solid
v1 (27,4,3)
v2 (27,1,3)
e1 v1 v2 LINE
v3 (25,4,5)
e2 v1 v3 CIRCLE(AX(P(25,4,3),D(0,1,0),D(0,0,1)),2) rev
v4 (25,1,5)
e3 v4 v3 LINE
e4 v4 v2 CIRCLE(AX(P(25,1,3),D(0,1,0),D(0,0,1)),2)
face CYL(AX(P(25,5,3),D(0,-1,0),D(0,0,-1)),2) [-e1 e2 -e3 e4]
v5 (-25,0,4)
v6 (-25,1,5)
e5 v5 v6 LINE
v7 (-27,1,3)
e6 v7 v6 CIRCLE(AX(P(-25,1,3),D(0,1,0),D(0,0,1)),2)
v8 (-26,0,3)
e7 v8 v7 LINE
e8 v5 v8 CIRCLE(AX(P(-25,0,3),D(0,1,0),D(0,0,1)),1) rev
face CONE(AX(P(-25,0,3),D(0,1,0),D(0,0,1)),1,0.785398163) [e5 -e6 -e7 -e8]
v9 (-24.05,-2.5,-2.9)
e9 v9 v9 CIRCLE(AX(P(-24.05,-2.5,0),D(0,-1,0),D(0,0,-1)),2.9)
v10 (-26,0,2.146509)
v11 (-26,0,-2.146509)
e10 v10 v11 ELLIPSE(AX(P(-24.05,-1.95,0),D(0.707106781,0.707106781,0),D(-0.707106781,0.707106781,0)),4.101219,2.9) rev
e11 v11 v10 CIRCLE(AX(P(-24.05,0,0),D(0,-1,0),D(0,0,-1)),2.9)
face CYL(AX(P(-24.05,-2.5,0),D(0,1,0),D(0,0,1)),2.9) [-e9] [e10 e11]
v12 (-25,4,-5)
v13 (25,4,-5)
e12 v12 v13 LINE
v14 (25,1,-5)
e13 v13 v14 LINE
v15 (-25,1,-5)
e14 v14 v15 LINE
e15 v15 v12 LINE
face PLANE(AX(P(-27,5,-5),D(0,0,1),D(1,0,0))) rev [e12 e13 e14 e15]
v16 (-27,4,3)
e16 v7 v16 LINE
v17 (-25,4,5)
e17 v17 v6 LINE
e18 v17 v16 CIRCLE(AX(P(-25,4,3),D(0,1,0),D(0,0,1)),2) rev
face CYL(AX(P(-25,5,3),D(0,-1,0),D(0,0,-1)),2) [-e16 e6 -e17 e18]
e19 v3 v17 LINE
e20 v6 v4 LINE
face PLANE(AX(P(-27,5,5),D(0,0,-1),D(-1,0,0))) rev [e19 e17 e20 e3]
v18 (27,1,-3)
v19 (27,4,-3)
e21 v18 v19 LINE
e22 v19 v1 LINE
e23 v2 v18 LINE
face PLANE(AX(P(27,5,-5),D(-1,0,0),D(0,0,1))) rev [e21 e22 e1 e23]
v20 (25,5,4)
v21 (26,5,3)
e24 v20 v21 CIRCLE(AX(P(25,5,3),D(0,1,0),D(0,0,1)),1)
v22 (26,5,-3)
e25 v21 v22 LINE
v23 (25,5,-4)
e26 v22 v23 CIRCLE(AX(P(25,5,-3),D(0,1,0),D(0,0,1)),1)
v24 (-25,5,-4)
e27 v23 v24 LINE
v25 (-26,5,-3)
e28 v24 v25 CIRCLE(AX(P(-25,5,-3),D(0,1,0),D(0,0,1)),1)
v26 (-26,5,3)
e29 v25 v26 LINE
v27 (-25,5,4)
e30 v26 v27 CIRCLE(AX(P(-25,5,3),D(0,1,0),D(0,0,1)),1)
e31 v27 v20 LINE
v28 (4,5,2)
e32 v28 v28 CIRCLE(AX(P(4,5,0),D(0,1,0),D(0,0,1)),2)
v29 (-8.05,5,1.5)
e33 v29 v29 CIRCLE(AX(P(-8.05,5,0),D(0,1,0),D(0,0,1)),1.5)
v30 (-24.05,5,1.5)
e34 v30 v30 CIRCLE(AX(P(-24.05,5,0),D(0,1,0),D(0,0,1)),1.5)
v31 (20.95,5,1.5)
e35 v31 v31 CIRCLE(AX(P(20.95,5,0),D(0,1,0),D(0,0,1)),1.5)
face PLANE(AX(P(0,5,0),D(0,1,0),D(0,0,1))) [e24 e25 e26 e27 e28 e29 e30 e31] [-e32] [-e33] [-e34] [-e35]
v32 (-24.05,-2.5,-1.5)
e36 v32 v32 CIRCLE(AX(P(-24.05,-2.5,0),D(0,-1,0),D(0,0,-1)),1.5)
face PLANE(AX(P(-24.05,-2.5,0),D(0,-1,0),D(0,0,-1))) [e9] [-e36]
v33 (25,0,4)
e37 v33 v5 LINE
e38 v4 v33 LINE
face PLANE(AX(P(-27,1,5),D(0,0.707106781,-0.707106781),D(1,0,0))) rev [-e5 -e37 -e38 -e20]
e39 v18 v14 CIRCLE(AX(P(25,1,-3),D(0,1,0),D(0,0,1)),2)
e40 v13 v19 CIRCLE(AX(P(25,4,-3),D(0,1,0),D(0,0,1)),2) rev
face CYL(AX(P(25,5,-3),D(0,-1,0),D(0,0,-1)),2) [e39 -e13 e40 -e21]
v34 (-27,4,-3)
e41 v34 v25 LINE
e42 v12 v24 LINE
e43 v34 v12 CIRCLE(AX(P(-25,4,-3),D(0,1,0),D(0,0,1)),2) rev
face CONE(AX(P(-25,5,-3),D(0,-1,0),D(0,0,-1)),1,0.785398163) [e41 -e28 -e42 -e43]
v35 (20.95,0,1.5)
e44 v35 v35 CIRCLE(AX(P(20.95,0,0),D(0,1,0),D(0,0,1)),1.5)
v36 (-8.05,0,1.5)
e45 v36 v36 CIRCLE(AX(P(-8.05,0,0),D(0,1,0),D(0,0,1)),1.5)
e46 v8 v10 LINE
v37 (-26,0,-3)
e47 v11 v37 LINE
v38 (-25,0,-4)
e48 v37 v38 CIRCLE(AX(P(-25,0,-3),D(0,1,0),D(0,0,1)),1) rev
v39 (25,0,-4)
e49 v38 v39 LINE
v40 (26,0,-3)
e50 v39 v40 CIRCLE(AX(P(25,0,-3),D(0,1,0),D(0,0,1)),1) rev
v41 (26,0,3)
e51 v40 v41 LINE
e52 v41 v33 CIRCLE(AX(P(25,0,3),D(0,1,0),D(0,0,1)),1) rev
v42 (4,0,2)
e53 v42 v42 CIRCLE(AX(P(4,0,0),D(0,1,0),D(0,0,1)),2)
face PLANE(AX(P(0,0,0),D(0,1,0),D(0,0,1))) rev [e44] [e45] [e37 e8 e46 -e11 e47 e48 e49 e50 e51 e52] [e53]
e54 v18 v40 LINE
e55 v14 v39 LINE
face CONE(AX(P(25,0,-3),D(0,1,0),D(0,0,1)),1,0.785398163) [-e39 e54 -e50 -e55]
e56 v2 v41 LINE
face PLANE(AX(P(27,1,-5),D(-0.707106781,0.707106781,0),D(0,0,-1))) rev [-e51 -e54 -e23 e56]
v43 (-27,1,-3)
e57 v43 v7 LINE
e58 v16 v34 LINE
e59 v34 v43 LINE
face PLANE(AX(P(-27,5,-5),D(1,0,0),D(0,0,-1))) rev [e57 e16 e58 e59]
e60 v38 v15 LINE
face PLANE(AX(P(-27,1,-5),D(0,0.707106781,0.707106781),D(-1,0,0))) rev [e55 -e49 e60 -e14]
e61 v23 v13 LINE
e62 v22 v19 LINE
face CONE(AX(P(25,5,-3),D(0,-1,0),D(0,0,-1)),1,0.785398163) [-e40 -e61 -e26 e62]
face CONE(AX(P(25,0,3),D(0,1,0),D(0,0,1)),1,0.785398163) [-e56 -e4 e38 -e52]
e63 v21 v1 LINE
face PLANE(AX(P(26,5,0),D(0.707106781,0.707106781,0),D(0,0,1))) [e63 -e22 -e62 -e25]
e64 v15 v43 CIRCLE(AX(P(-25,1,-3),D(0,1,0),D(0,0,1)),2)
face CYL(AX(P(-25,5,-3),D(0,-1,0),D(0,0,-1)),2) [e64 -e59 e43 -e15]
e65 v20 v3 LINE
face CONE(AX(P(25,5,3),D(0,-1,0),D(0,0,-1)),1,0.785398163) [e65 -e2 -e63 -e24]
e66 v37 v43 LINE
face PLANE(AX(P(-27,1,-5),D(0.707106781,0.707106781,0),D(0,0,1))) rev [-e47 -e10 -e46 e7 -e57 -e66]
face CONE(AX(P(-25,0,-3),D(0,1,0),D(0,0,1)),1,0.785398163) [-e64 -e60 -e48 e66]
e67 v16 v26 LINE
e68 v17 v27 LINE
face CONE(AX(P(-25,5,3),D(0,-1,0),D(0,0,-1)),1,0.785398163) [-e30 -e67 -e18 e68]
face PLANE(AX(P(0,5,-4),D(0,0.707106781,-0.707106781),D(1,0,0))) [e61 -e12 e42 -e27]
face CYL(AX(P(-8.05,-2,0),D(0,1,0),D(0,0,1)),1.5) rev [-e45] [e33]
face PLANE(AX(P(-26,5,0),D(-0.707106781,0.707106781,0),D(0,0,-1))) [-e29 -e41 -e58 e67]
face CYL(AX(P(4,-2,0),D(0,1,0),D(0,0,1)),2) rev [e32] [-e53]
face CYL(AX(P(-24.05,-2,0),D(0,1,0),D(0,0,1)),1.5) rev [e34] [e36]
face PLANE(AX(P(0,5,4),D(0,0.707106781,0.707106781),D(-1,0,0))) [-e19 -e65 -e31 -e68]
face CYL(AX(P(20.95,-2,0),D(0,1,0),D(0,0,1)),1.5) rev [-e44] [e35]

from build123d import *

# Parameters (mm, degrees)
SKETCH1_W           = 54
SKETCH1_H           = 10
BOSS_EXTRUDE1_DEPTH = 5
SKETCH3_R           = 1.5
SKETCH3_R_2         = 2
CUT_EXTRUDE1_DEPTH  = 7
FILLET1_R           = 2
SKETCH4_R           = 2.9
SKETCH4_R_2         = 1.5
BOSS_EXTRUDE2_DEPTH = 2.5
CHAMFER1_SIZE       = 1


with BuildPart() as part:
    # Sketch1 → Boss-Extrude1 (new body)
    with BuildSketch(Plane(origin=(0, 0, 0), x_dir=(1, 0, 0), z_dir=(0, 1, 0))):
        Rectangle(SKETCH1_W, SKETCH1_H)
    extrude(amount=BOSS_EXTRUDE1_DEPTH)

    # Sketch3 → Cut-Extrude1 (cut)
    with BuildSketch(Plane(origin=(0, 5, 0), x_dir=(1, 0, 0), z_dir=(0, 1, 0))):
        with Locations(Location((-24.05, 0, 0), (0, 0, 270))):
            Circle(SKETCH3_R)
        with Locations(Location((4, 0, 0), (0, 0, 270))):
            Circle(SKETCH3_R_2)
        with Locations(Location((-8.05, 0, 0), (0, 0, 270))):
            Circle(SKETCH3_R)
        with Locations(Location((20.95, 0, 0), (0, 0, 270))):
            Circle(SKETCH3_R)
    extrude(amount=-CUT_EXTRUDE1_DEPTH, mode=Mode.SUBTRACT)

    # Fillet1
    fillet1_edges = [part.edges().sort_by_distance(p)[0] for p in [
        (27, 2.5, 5),
        (-27, 2.5, 5),
        (-27, 2.5, -5),
        (27, 2.5, -5),
    ]]
    fillet(fillet1_edges, radius=FILLET1_R)

    # Sketch4 → Boss-Extrude2 (add)
    with BuildSketch(Plane.XZ):
        with Locations(Location((-24.05, 0, 0), (0, 0, 270))):
            Circle(SKETCH4_R)
        with Locations(Location((-24.05, 0, 0), (0, 0, 90))):
            Circle(SKETCH4_R_2, mode=Mode.SUBTRACT)
    extrude(amount=BOSS_EXTRUDE2_DEPTH)

    # Chamfer1
    # the kernel refuses this chamfer: 1 mm, written as the material it takes off along each edge
    with BuildSketch(Plane(origin=(-25, 0, -5), x_dir=(0, 0.9996219169112968, -0.027495876610586494), z_dir=(1, 0, 0)), Plane(origin=(25, 5, 5), x_dir=(0, 0.027495876610586487, -0.9996219169112968), z_dir=(-1, 0, 0))) as chamfer1_piece_1:
        Polygon((CHAMFER1_SIZE * 0.999621916911, CHAMFER1_SIZE * 0.0274958766106), (-CHAMFER1_SIZE * 0.0274958766106, CHAMFER1_SIZE * 0.999621916911), (0, 0), align=None)
    extrude(amount=50, mode=Mode.SUBTRACT)
    with BuildSketch(Plane(origin=(-25, 5, -5), x_dir=(0, -0.9996219169112968, -0.027495876610586487), z_dir=(1, 0, 0)), Plane(origin=(25, 0, 5), x_dir=(0, -0.027495876610586365, -0.9996219169112968), z_dir=(-1, 0, 0))) as chamfer1_piece_2:
        Polygon((CHAMFER1_SIZE * 0.999621916911, -CHAMFER1_SIZE * 0.0274958766106), (-CHAMFER1_SIZE * 0.0274958766106, -CHAMFER1_SIZE * 0.999621916911), (0, 0), align=None)
    extrude(amount=50, mode=Mode.SUBTRACT)
    with BuildSketch(Plane(origin=(27, 0, -3), x_dir=(-0.9996219169112968, -0.02749587661058639, 0), z_dir=(0, 0, 1))) as chamfer1_piece_3:
        Polygon((CHAMFER1_SIZE * 0.999621916911, -CHAMFER1_SIZE * 0.0274958766106), (-CHAMFER1_SIZE * 0.0274958766106, -CHAMFER1_SIZE * 0.999621916911), (0, 0), align=None)
    extrude(amount=6, mode=Mode.SUBTRACT)
    with BuildSketch(Plane(origin=(-27, 0, 3), x_dir=(0.9996219169112968, -0.02749587661058639, 0), z_dir=(0, 0, -1))) as chamfer1_piece_4_section:
        Polygon((CHAMFER1_SIZE * 0.999621916911, -CHAMFER1_SIZE * 0.0274958766106), (-CHAMFER1_SIZE * 0.0274958766106, -CHAMFER1_SIZE * 0.999621916911), (0, 0), align=None)
    chamfer1_piece_4 = extrude(amount=6, mode=Mode.PRIVATE)
    chamfer1_piece_4 = chamfer1_piece_4 - Plane(origin=(-24.05, 0.490897833, 0), x_dir=(0, 0, -1), z_dir=(0, 1, 0)) * Cylinder(2.9, 16, mode=Mode.PRIVATE)
    add(chamfer1_piece_4, mode=Mode.SUBTRACT)
    with BuildSketch(Plane(origin=(-25, 0, 3), x_dir=(-1, 0, 0), z_dir=(0, 0, -1))) as chamfer1_piece_5:
        Polygon((2 - CHAMFER1_SIZE, 0), (2, CHAMFER1_SIZE), (2, 0), align=None)
    revolve(axis=Axis((-25, 0, 3), (0, 1, 0)), revolution_arc=90, mode=Mode.SUBTRACT)
    with BuildSketch(Plane(origin=(25, 0, 3), x_dir=(1, 0, 0), z_dir=(0, 0, -1))) as chamfer1_piece_6:
        Polygon((2 - CHAMFER1_SIZE, 0), (2, -CHAMFER1_SIZE), (2, 0), align=None)
    revolve(axis=Axis((25, 0, 3), (0, -1, 0)), revolution_arc=90, mode=Mode.SUBTRACT)
    with BuildSketch(Plane(origin=(-25, 0, -3), x_dir=(0, 0, -1), z_dir=(1, 0, 0))) as chamfer1_piece_7:
        Polygon((2 - CHAMFER1_SIZE, 0), (2, CHAMFER1_SIZE), (2, 0), align=None)
    revolve(axis=Axis((-25, 0, -3), (0, 1, 0)), revolution_arc=90, mode=Mode.SUBTRACT)
    with BuildSketch(Plane(origin=(25, 0, -3), x_dir=(0, 0, -1), z_dir=(-1, 0, 0))) as chamfer1_piece_8:
        Polygon((2 - CHAMFER1_SIZE, 0), (2, -CHAMFER1_SIZE), (2, 0), align=None)
    revolve(axis=Axis((25, 0, -3), (0, -1, 0)), revolution_arc=90, mode=Mode.SUBTRACT)
    with BuildSketch(Plane(origin=(27, 5, -3), x_dir=(-0.9996219169112968, 0.02749587661058651, 0), z_dir=(0, 0, 1)), Plane(origin=(-27, 5, 3), x_dir=(0.9996219169112968, 0.02749587661058651, 0), z_dir=(0, 0, -1))) as chamfer1_piece_9:
        Polygon((CHAMFER1_SIZE * 0.999621916911, CHAMFER1_SIZE * 0.0274958766106), (-CHAMFER1_SIZE * 0.0274958766106, CHAMFER1_SIZE * 0.999621916911), (0, 0), align=None)
    extrude(amount=6, mode=Mode.SUBTRACT)
    with BuildSketch(Plane(origin=(-25, 5, 3), x_dir=(-1, 0, 0), z_dir=(0, 0, -1))) as chamfer1_piece_10:
        Polygon((2 - CHAMFER1_SIZE, 0), (2, -CHAMFER1_SIZE), (2, 0), align=None)
    revolve(axis=Axis((-25, 5, 3), (0, 1, 0)), revolution_arc=90, mode=Mode.SUBTRACT)
    with BuildSketch(Plane(origin=(25, 5, 3), x_dir=(1, 0, 0), z_dir=(0, 0, -1))) as chamfer1_piece_11:
        Polygon((2 - CHAMFER1_SIZE, 0), (2, CHAMFER1_SIZE), (2, 0), align=None)
    revolve(axis=Axis((25, 5, 3), (0, -1, 0)), revolution_arc=90, mode=Mode.SUBTRACT)
    with BuildSketch(Plane(origin=(-25, 5, -3), x_dir=(0, 0, -1), z_dir=(1, 0, 0))) as chamfer1_piece_12:
        Polygon((2, -CHAMFER1_SIZE), (2 - CHAMFER1_SIZE, 0), (2, 0), align=None)
    revolve(axis=Axis((-25, 5, -3), (0, 1, 0)), revolution_arc=90, mode=Mode.SUBTRACT)
    with BuildSketch(Plane(origin=(25, 5, -3), x_dir=(0, 0, -1), z_dir=(-1, 0, 0))) as chamfer1_piece_13:
        Polygon((2, CHAMFER1_SIZE), (2 - CHAMFER1_SIZE, 0), (2, 0), align=None)
    revolve(axis=Axis((25, 5, -3), (0, -1, 0)), revolution_arc=90, mode=Mode.SUBTRACT)


solid = part.part
